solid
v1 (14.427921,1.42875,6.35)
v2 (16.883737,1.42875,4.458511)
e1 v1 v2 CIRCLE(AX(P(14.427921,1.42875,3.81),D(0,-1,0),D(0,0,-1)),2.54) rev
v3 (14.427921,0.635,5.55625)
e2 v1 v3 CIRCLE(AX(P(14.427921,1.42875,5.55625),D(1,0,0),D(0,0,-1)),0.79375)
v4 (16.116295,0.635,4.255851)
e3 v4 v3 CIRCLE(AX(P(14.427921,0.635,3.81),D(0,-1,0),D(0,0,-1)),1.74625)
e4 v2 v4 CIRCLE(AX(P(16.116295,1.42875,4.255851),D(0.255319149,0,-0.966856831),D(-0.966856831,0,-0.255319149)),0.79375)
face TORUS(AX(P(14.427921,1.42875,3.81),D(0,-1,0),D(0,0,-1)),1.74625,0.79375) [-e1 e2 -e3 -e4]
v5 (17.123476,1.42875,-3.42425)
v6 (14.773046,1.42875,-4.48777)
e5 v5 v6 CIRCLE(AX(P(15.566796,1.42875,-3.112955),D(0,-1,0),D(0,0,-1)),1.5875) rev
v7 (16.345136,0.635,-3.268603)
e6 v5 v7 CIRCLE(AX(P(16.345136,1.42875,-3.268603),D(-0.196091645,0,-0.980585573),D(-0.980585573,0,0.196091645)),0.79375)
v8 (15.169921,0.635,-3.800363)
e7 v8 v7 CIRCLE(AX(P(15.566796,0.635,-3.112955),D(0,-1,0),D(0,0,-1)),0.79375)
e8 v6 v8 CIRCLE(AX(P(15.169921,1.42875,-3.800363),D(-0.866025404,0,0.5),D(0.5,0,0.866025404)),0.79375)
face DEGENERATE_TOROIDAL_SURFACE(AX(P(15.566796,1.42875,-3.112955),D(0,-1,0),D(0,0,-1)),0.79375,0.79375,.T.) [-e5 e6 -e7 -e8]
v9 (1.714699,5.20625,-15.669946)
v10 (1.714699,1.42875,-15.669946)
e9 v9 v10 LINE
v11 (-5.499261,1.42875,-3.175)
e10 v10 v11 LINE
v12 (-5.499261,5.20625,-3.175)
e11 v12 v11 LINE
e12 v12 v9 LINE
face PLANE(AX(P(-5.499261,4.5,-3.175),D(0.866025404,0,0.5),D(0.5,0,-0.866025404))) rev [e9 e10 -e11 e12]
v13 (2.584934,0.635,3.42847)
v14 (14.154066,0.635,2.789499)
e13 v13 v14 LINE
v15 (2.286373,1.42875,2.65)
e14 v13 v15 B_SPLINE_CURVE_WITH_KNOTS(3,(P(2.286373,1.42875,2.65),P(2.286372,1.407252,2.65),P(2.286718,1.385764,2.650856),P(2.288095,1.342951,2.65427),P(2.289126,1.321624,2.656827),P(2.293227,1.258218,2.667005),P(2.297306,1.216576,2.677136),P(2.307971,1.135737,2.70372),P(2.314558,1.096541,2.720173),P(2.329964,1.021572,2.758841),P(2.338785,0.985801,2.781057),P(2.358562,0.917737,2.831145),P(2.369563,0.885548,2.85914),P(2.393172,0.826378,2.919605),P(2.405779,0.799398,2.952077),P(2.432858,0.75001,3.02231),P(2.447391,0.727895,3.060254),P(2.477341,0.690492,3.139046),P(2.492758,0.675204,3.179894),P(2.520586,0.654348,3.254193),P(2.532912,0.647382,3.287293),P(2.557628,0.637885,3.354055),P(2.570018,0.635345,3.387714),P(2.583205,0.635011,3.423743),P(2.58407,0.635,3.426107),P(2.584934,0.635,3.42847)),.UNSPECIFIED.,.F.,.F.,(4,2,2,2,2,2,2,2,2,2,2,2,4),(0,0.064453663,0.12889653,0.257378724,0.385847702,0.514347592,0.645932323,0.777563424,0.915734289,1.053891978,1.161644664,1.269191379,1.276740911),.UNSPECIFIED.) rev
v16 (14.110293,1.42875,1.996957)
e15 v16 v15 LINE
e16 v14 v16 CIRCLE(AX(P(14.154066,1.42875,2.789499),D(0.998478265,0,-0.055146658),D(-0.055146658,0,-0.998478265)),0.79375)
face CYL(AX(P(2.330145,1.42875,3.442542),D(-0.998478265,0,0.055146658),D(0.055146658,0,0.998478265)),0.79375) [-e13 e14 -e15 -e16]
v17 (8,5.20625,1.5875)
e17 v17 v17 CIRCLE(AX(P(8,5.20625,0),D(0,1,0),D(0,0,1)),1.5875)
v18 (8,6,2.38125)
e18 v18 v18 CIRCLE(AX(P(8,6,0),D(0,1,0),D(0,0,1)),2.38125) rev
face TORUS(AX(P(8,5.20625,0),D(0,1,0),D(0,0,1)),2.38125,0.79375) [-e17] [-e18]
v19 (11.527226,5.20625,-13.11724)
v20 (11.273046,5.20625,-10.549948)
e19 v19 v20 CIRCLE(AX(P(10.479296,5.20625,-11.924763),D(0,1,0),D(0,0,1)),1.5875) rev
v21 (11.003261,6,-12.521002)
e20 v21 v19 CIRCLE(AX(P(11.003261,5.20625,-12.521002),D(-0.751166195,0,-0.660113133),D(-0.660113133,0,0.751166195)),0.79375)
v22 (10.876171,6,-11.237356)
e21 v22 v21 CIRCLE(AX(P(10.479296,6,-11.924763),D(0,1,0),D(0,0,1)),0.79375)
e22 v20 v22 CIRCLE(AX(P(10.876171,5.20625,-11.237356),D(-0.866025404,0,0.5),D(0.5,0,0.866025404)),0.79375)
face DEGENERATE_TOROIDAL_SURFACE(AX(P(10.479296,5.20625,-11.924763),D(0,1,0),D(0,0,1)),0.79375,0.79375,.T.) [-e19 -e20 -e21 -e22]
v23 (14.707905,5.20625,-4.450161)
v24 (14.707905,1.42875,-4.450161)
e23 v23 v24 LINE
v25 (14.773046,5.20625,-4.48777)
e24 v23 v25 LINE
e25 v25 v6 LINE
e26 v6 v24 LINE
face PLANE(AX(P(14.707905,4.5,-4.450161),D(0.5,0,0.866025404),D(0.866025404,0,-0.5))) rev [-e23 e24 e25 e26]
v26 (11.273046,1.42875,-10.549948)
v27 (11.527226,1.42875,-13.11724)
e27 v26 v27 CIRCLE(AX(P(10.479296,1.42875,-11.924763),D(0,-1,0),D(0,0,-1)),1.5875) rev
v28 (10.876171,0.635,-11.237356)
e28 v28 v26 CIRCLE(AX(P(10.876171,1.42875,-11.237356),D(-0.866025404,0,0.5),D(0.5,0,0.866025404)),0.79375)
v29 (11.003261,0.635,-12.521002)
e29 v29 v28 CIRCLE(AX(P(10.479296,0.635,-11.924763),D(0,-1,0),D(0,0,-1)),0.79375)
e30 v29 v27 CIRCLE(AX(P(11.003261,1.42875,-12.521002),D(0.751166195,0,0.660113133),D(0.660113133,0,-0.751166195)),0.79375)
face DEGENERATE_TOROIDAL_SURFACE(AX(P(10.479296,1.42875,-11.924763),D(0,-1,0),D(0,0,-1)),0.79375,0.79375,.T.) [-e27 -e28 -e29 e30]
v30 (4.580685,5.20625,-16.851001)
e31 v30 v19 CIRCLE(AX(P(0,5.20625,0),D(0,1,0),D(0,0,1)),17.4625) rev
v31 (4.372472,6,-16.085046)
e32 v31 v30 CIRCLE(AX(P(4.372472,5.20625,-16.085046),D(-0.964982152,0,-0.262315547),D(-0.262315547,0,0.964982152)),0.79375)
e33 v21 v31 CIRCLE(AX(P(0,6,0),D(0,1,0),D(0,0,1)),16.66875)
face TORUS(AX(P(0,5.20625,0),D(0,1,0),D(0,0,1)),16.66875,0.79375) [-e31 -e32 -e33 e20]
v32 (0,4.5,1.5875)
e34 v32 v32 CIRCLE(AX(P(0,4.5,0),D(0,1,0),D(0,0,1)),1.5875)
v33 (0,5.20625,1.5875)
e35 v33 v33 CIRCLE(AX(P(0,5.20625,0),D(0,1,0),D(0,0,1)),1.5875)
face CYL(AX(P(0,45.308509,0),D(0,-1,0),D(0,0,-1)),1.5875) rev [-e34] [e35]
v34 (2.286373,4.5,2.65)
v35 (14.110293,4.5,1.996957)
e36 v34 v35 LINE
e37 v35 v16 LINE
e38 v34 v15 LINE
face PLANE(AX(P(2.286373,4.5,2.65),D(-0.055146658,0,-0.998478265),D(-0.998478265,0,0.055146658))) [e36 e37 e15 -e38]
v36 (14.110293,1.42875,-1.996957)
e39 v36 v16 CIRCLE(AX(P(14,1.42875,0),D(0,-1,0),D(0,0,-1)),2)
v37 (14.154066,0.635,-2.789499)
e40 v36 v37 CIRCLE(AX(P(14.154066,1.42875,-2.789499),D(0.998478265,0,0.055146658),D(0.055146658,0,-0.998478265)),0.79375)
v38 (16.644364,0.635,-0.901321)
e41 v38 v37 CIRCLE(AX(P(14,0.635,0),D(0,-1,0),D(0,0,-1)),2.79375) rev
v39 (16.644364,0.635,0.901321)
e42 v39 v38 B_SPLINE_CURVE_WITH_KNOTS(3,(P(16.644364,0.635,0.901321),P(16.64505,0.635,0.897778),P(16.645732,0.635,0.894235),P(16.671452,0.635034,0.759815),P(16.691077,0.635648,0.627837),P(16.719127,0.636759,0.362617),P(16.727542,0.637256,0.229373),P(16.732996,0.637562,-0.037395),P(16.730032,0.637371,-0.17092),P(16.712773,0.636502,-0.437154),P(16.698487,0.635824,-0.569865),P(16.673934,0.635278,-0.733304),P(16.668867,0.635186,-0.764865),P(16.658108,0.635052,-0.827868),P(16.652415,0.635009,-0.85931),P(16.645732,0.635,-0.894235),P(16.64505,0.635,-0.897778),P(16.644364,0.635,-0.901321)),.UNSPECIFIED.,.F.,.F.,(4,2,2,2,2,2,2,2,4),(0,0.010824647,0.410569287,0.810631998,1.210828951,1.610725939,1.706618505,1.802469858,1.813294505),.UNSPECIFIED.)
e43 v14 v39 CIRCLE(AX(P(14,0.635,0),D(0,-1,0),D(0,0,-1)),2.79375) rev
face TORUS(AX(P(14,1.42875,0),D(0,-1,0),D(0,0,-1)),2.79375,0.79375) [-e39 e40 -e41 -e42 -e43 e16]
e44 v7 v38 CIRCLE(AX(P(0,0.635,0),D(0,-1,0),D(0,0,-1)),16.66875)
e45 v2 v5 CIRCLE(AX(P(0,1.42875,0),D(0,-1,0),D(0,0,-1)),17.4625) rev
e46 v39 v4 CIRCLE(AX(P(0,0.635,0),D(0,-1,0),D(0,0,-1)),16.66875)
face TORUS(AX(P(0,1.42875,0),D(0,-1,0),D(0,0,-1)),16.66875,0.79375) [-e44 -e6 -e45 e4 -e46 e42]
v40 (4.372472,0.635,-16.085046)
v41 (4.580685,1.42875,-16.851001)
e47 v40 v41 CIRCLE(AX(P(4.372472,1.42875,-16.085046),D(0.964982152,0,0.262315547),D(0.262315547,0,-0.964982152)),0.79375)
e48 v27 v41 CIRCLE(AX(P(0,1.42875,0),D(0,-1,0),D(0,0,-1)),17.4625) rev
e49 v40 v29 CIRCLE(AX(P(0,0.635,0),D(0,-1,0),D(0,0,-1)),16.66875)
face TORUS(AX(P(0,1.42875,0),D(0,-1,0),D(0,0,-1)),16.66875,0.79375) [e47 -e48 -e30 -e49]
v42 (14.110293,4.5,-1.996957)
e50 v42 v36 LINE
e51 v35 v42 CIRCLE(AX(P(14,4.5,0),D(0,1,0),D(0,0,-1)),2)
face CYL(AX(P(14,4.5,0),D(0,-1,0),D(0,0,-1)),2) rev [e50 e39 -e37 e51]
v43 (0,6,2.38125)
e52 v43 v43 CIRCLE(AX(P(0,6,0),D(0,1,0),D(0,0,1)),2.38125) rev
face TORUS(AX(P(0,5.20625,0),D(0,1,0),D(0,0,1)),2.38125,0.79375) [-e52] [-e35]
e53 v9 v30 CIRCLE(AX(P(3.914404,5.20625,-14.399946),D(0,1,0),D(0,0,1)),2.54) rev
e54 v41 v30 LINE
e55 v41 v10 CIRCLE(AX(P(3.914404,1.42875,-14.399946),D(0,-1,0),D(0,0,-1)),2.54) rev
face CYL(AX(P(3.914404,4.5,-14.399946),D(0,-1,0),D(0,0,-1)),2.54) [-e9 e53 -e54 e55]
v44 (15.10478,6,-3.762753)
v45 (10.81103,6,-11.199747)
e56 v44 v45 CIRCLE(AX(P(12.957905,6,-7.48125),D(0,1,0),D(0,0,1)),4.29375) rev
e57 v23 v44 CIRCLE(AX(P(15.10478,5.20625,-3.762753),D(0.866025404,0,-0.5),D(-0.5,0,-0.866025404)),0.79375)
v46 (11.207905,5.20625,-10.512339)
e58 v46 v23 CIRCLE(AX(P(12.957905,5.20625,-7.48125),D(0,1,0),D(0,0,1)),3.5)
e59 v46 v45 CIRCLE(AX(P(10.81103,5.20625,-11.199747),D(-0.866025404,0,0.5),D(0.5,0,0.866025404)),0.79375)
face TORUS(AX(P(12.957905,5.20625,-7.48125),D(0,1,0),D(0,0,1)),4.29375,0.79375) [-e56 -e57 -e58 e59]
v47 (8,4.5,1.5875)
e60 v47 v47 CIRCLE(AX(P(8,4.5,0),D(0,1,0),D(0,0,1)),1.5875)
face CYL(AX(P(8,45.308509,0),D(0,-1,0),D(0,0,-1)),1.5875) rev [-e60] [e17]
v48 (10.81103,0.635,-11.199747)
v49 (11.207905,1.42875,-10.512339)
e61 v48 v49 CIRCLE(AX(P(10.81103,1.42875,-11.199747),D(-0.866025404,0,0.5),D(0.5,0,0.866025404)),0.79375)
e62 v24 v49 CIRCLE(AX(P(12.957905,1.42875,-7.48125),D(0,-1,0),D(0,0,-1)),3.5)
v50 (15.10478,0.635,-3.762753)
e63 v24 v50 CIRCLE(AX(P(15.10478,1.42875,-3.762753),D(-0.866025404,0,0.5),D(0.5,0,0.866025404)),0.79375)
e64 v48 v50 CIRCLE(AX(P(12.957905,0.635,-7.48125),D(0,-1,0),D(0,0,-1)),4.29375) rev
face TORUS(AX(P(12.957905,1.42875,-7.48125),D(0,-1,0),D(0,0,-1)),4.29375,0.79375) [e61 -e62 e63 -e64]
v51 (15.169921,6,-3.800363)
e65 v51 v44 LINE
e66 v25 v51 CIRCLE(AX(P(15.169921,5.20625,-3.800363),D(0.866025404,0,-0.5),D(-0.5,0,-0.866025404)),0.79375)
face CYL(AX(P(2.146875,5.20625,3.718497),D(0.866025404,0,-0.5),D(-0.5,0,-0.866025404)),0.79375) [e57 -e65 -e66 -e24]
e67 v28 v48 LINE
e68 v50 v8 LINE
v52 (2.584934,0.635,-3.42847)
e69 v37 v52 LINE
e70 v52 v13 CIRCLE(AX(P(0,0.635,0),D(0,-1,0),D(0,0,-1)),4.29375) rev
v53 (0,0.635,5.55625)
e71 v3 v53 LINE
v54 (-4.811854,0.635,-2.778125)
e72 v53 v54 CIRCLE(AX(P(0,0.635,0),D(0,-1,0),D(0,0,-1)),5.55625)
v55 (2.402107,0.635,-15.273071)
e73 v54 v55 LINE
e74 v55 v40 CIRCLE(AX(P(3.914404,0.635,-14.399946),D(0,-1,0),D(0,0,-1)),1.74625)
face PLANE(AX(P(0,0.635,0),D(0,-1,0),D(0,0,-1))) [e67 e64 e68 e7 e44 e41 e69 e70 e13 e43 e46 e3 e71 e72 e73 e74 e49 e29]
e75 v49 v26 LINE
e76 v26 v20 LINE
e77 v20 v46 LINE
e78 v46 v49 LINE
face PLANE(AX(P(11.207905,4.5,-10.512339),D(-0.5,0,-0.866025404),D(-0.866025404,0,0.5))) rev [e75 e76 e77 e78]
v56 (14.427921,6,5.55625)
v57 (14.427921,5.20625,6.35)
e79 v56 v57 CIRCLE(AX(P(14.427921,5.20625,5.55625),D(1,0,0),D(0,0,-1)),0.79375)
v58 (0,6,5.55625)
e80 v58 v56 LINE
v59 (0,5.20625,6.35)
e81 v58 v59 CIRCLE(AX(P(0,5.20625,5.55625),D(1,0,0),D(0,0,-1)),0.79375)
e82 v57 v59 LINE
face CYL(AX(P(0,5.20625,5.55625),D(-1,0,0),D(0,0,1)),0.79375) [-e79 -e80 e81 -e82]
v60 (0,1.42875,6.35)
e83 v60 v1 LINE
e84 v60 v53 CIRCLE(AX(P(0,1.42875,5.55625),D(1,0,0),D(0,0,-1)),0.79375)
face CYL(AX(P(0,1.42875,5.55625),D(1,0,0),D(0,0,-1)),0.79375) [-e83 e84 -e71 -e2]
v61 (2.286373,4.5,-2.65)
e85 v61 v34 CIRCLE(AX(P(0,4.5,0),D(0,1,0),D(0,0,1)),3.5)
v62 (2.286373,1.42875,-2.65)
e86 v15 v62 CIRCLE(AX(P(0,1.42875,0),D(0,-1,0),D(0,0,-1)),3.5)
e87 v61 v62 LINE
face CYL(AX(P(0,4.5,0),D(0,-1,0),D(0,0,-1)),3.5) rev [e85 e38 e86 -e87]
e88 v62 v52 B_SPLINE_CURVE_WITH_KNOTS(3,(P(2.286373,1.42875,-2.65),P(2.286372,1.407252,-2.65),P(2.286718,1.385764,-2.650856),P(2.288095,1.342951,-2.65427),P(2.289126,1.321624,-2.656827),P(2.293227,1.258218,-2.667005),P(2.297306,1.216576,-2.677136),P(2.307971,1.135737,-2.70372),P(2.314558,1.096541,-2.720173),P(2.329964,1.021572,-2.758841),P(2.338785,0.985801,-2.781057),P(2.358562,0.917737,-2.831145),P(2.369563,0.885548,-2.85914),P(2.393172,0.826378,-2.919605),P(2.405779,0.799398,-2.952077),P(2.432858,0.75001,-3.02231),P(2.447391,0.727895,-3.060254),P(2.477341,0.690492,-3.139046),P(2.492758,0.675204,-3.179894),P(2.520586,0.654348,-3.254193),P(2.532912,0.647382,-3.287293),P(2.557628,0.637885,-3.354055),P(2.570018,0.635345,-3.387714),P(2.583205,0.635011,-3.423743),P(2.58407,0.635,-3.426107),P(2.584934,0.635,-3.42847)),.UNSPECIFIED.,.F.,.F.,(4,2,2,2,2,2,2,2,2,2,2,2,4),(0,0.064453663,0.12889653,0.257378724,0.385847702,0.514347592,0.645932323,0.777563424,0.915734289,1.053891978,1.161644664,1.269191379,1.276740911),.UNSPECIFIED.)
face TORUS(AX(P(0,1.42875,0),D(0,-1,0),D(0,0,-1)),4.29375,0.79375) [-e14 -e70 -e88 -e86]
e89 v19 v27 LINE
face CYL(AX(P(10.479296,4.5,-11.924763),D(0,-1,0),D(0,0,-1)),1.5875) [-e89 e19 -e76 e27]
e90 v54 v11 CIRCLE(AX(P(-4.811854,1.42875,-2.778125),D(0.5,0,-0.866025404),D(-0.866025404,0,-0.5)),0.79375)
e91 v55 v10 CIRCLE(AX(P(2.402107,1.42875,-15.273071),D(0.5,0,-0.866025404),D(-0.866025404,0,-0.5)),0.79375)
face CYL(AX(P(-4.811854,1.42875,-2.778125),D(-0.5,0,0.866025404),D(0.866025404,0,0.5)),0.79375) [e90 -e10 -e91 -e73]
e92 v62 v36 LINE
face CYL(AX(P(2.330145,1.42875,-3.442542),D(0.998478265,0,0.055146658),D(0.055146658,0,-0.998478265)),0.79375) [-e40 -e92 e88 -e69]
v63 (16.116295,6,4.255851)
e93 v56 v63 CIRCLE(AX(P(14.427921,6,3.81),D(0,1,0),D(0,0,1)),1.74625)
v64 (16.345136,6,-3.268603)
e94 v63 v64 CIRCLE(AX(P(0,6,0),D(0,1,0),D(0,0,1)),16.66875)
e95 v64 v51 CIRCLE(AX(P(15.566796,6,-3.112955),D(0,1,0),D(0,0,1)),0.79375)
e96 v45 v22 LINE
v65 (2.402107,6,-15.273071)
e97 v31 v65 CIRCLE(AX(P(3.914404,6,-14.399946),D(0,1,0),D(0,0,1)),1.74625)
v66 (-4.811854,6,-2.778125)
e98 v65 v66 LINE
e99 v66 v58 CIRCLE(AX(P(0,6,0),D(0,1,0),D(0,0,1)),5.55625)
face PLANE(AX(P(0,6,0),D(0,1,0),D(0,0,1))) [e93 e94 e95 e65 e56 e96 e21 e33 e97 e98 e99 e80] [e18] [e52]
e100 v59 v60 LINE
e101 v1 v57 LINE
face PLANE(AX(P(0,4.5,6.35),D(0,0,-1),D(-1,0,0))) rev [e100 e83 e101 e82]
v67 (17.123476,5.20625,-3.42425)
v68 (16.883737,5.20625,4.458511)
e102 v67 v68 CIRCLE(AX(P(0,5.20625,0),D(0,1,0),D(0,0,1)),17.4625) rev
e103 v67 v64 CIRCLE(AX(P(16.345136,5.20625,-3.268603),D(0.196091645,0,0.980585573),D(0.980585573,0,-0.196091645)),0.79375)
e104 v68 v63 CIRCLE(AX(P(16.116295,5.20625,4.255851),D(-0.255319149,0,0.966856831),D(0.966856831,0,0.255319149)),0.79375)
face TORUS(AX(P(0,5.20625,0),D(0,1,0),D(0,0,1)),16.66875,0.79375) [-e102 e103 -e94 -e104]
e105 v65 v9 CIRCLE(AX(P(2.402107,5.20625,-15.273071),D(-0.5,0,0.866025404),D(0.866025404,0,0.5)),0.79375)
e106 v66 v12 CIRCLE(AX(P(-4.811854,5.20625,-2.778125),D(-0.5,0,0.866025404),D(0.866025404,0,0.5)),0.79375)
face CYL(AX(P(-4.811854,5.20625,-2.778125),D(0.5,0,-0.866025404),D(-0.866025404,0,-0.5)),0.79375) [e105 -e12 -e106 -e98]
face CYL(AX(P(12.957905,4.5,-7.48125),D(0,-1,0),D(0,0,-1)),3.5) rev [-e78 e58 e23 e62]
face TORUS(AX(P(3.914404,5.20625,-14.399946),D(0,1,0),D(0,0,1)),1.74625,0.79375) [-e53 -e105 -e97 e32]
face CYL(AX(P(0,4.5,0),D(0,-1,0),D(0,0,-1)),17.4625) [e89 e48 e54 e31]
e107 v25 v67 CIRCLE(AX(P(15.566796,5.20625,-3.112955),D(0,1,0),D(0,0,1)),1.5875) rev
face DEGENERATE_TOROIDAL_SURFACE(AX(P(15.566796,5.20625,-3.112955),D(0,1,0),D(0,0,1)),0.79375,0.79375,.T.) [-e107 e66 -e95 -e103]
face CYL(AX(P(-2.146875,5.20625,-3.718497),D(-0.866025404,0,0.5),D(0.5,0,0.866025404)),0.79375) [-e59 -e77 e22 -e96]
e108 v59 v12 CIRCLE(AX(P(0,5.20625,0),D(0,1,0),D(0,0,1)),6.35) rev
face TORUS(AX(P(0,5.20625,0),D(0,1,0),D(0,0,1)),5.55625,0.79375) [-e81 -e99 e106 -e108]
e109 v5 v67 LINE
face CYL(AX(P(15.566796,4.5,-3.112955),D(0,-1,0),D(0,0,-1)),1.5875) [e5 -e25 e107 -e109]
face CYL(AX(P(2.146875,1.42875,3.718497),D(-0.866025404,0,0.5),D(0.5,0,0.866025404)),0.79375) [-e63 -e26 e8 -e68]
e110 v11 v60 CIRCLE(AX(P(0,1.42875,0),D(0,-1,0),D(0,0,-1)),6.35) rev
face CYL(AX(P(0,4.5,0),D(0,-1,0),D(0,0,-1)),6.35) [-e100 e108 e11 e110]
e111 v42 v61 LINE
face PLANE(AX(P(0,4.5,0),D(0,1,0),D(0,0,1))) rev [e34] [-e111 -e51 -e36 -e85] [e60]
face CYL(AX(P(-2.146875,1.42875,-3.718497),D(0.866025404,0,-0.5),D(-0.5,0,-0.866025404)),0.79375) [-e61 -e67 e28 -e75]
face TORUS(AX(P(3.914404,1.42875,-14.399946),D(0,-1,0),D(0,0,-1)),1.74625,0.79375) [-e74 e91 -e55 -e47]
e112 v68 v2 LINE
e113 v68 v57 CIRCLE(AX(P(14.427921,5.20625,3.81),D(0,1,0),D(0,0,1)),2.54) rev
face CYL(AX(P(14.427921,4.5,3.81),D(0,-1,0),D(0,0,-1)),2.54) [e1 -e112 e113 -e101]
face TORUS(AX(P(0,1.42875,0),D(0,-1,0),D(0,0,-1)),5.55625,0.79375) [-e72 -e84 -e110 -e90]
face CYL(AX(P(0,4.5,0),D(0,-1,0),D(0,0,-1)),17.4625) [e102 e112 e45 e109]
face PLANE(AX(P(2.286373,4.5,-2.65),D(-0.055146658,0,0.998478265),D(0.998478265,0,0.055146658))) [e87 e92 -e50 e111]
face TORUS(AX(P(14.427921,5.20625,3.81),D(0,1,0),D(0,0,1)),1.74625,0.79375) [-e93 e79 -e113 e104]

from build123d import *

# Parameters (mm, degrees)
BOSS_EXTRUDE1_DEPTH = 4.5
FILLET4_R           = 2.54
SKETCH2_R           = 1.5875
BOSS_EXTRUDE2_DEPTH = 1.5
CUT_EXTRUDE1_DEPTH  = 0.635
FILLET1_R           = 1.5875
FILLET2_R           = 0.79375
FILLET3_R           = 0.79375


with BuildPart() as part:
    # Sketch1 → Boss-Extrude1 (new body)
    with BuildSketch(Plane(origin=(0, 0, 0), x_dir=(1, 0, 0), z_dir=(0, 1, 0))):
        with BuildLine():
            Line((11.207905104, 10.512338913), (13.066095292, 11.585165518))
            ThreePointArc((13.066095292, 11.585165518), (8.347679713, 15.338029523), (2.634255856, 17.262664984))
            Line((2.634255856, 17.262664984), (-5.499261314, 3.175))
            ThreePointArc((-5.499261314, 3.175), (-5.499261314, -3.175), (0, -6.35))
            Line((0, -6.35), (16.267034341, -6.35))
            ThreePointArc((16.267034341, -6.35), (17.456963068, -0.439712068), (16.566095292, 5.522987692))
            Line((16.566095292, 5.522987692), (14.707905104, 4.450161087))
            ThreePointArc((14.707905104, 4.450161087), (9.926816191, 5.73125), (11.207905104, 10.512338913))
        make_face()
        with BuildLine():
            Line((2.286372673, 2.65), (14.110293316, 1.99695653))
            ThreePointArc((14.110293316, 1.99695653), (16, 0), (14.110293316, -1.99695653))
            Line((14.110293316, -1.99695653), (2.286372673, -2.65))
            ThreePointArc((2.286372673, -2.65), (-3.5, 0), (2.286372673, 2.65))
        make_face(mode=Mode.SUBTRACT)
    extrude(amount=BOSS_EXTRUDE1_DEPTH)

    # Fillet4
    fillet4_edges = [part.edges().sort_by_distance(p)[0] for p in [
        (2.634255856, 2.25, -17.262664984),
        (16.267034341, 2.25, 6.35),
    ]]
    fillet(fillet4_edges, radius=FILLET4_R)

    # Sketch2 → Boss-Extrude2 (add)
    with BuildSketch(Plane(origin=(0, 4.5, 0), x_dir=(1, 0, 0), z_dir=(0, 1, 0))):
        with BuildLine():
            Line((16.566095292, 5.522987692), (14.707905104, 4.450161087))
            ThreePointArc((14.707905104, 4.450161087), (9.926816191, 5.73125), (11.207905104, 10.512338913))
            Line((11.207905104, 10.512338913), (13.066095292, 11.585165518))
            ThreePointArc((13.066095292, 11.585165518), (9.207848343, 14.837602069), (4.580685232, 16.851000832))
            ThreePointArc((4.580685232, 16.851000832), (2.94663875, 16.748356461), (1.714699218, 15.669946166))
            Line((1.714699218, 15.669946166), (-5.499261314, 3.175))
            ThreePointArc((-5.499261314, 3.175), (-5.499261314, -3.175), (0, -6.35))
            Line((0, -6.35), (14.427921065, -6.35))
            ThreePointArc((14.427921065, -6.35), (15.977821542, -5.822314218), (16.883737416, -4.458510638))
            ThreePointArc((16.883737416, -4.458510638), (17.453664494, 0.555429545), (16.566095292, 5.522987692))
        make_face()
        with Locations(Location((0, 0, 0), (0, 0, 270))):
            Circle(SKETCH2_R, mode=Mode.SUBTRACT)
        with Locations(Location((8, 0, 0), (0, 0, 270))):
            Circle(SKETCH2_R, mode=Mode.SUBTRACT)
    extrude(amount=BOSS_EXTRUDE2_DEPTH)

    # Sketch3 → Cut-Extrude1 (cut)
    with BuildSketch(Plane.XZ):
        with BuildLine():
            Line((-5.499261314, -3.175), (1.714699218, -15.669946166))
            ThreePointArc((1.714699218, -15.669946166), (2.94663875, -16.748356461), (4.580685232, -16.851000832))
            ThreePointArc((4.580685232, -16.851000832), (9.207848343, -14.837602069), (13.066095292, -11.585165518))
            Line((13.066095292, -11.585165518), (11.207905104, -10.512338913))
            ThreePointArc((11.207905104, -10.512338913), (9.926816191, -5.73125), (14.707905104, -4.450161087))
            Line((14.707905104, -4.450161087), (16.566095292, -5.522987692))
            ThreePointArc((16.566095292, -5.522987692), (17.453664494, -0.555429545), (16.883737416, 4.458510638))
            ThreePointArc((16.883737416, 4.458510638), (15.977821542, 5.822314218), (14.427921065, 6.35))
            Line((14.427921065, 6.35), (0, 6.35))
            ThreePointArc((0, 6.35), (-5.499261314, 3.175), (-5.499261314, -3.175))
        make_face()
    extrude(amount=-CUT_EXTRUDE1_DEPTH, mode=Mode.SUBTRACT)

    # Fillet1
    fillet1_edges = [part.edges().sort_by_distance(p)[0] for p in [
        (13.066095292, 3.3175, -11.585165518),
        (16.566095292, 3.3175, -5.522987692),
    ]]
    fillet(fillet1_edges, radius=FILLET1_R)

    # Fillet2
    # the kernel refuses this fillet: 0.79375 mm, written as the material it takes off along each edge
    with BuildSketch(Plane(origin=(0.305017366, 0.635, 2.75943165), x_dir=(0.05514665822650493, 0, 0.9984782652048311), z_dir=(0.9984782652048312, 0, -0.055146658226504934)), Plane(origin=(14.110293316, 0.635, -1.99695653), x_dir=(0.055146658226504934, 0, -0.9984782652048311), z_dir=(-0.9984782652048312, 0, -0.055146658226504934))) as fillet2_piece_1:
        with BuildLine():
            CenterArc((FILLET2_R, -FILLET2_R), FILLET2_R, 90, 90)
            Line((0, -FILLET2_R), (0, 0))
            Line((0, 0), (FILLET2_R, 0))
        make_face()
    extrude(amount=13.826315937, mode=Mode.SUBTRACT)
    with BuildSketch(Plane(origin=(0, 0.635, 0), x_dir=(0.958233566749164, 0, 0.28598676814701657), z_dir=(0.28598676814701657, 0, -0.958233566749164))) as fillet2_piece_2:
        with BuildLine():
            CenterArc((3.5 + FILLET2_R, -FILLET2_R), FILLET2_R, 90, 90)
            Line((3.5, -FILLET2_R), (3.5, 0))
            Line((3.5, 0), (3.5 + FILLET2_R, 0))
        make_face()
    revolve(axis=Axis((0, 0.635, 0), (0, -1, 0)), revolution_arc=326.764317032, mode=Mode.SUBTRACT)
    with BuildSketch(Plane(origin=(14, 0.635, 0), x_dir=(0.055146658226505, 0, -0.9984782652048312), z_dir=(-0.9984782652048312, 0, -0.055146658226505))) as fillet2_piece_3:
        with BuildLine():
            CenterArc((2 + FILLET2_R, -FILLET2_R), FILLET2_R, 90, 90)
            Line((2, -FILLET2_R), (2, 0))
            Line((2, 0), (2 + FILLET2_R, 0))
        make_face()
    revolve(axis=Axis((14, 0.635, 0), (0, -1, 0)), revolution_arc=173.677451052, mode=Mode.SUBTRACT)
    with BuildSketch(Plane(origin=(11.273045979, 0.635, -10.549948015), x_dir=(-0.5, 0, -0.8660254037844386), z_dir=(-0.8660254037844387, 0, 0.5000000000000001)), Plane(origin=(14.707905104, 0.635, -4.450161087), x_dir=(0.5000000000000067, 0, 0.8660254037844347), z_dir=(0.8660254037844348, 0, -0.5000000000000067))) as fillet2_piece_4:
        with BuildLine():
            CenterArc((FILLET2_R, -FILLET2_R), FILLET2_R, 90, 90)
            Line((0, -FILLET2_R), (0, 0))
            Line((0, 0), (FILLET2_R, 0))
        make_face()
    extrude(amount=0.075218203, mode=Mode.SUBTRACT)
    with BuildSketch(Plane(origin=(0, 0.635, 0), x_dir=(0.9805855734593999, 0, -0.19609164470547952), z_dir=(-0.19609164470547952, 0, -0.9805855734593999))) as fillet2_piece_5:
        with BuildLine():
            CenterArc((17.4625 - FILLET2_R, -FILLET2_R), FILLET2_R, 0, 90)
            Line((17.4625 - FILLET2_R, 0), (17.4625, 0))
            Line((17.4625, 0), (17.4625, -FILLET2_R))
        make_face()
    revolve(axis=Axis((0, 0.635, 0), (0, -1, 0)), revolution_arc=26.100998532, mode=Mode.SUBTRACT)
    with BuildSketch(Plane(origin=(10.479295979, 0.635, -11.924763343), x_dir=(0.6601131325145184, 0, -0.7511661948476316), z_dir=(-0.7511661948476316, 0, -0.6601131325145184))) as fillet2_piece_6:
        with BuildLine():
            CenterArc((1.5875 - FILLET2_R, -FILLET2_R), FILLET2_R, 0, 90)
            Line((1.5875, -FILLET2_R), (1.5875, 0))
            Line((1.5875, 0), (1.5875 - FILLET2_R, 0))
        make_face()
    revolve(axis=Axis((10.479295979, 0.635, -11.924763343), (0, -1, 0)), revolution_arc=108.69149851, mode=Mode.SUBTRACT)
    with BuildSketch(Plane(origin=(15.566795979, 0.635, -3.11295486), x_dir=(0.9805855734593999, 0, -0.1960916447054792), z_dir=(0.1960916447054792, 0, 0.9805855734593999))) as fillet2_piece_7:
        with BuildLine():
            CenterArc((1.5875 - FILLET2_R, FILLET2_R), FILLET2_R, 270, 90)
            Line((1.5875, FILLET2_R), (1.5875, 0))
            Line((1.5875, 0), (1.5875 - FILLET2_R, 0))
        make_face()
    revolve(axis=Axis((15.566795979, 0.635, -3.11295486), (0, 1, 0)), revolution_arc=108.69149851, mode=Mode.SUBTRACT)
    with BuildSketch(Plane(origin=(0, 0.635, 0), x_dir=(0, 0, 1), z_dir=(1, 0, 0))) as fillet2_piece_8:
        with BuildLine():
            CenterArc((6.35 - FILLET2_R, -FILLET2_R), FILLET2_R, 0, 90)
            Line((6.35, -FILLET2_R), (6.35, 0))
            Line((6.35, 0), (6.35 - FILLET2_R, 0))
        make_face()
    revolve(axis=Axis((0, 0.635, 0), (0, -1, 0)), revolution_arc=120, mode=Mode.SUBTRACT)
    with BuildSketch(Plane(origin=(14.427921065, 0.635, 6.35), x_dir=(0, 0, -1), z_dir=(-1, 0, 0)), Plane(origin=(-5.499261314, 0.635, -3.175), x_dir=(0.8660254037844398, 0, 0.49999999999999817), z_dir=(0.49999999999999817, 0, -0.8660254037844397))) as fillet2_piece_9:
        with BuildLine():
            CenterArc((FILLET2_R, -FILLET2_R), FILLET2_R, 90, 90)
            Line((0, -FILLET2_R), (0, 0))
            Line((0, 0), (FILLET2_R, 0))
        make_face()
    extrude(amount=14.427921065, mode=Mode.SUBTRACT)
    with BuildSketch(Plane(origin=(14.427921065, 0.635, 3.81), x_dir=(0.9668568312767465, 0, 0.25531914893616775), z_dir=(0.25531914893616775, 0, -0.9668568312767465))) as fillet2_piece_10:
        with BuildLine():
            CenterArc((2.54 - FILLET2_R, -FILLET2_R), FILLET2_R, 0, 90)
            Line((2.54, -FILLET2_R), (2.54, 0))
            Line((2.54, 0), (2.54 - FILLET2_R, 0))
        make_face()
    revolve(axis=Axis((14.427921065, 0.635, 3.81), (0, -1, 0)), revolution_arc=75.207502959, mode=Mode.SUBTRACT)
    with BuildSketch(Plane(origin=(12.957905104, 0.635, -7.48125), x_dir=(-0.5000000000000012, 0, -0.8660254037844379), z_dir=(0.8660254037844379, 0, -0.5000000000000012))) as fillet2_piece_11:
        with BuildLine():
            CenterArc((3.5 + FILLET2_R, FILLET2_R), FILLET2_R, 180, 90)
            Line((3.5, FILLET2_R), (3.5, 0))
            Line((3.5, 0), (3.5 + FILLET2_R, 0))
        make_face()
    revolve(axis=Axis((12.957905104, 0.635, -7.48125), (0, 1, 0)), revolution_arc=180, mode=Mode.SUBTRACT)
    with BuildSketch(Plane(origin=(0, 0.635, 0), x_dir=(0.26231554658702627, 0, -0.9649821521762719), z_dir=(-0.9649821521762719, 0, -0.26231554658702627))) as fillet2_piece_12:
        with BuildLine():
            CenterArc((17.4625 - FILLET2_R, -FILLET2_R), FILLET2_R, 0, 90)
            Line((17.4625, -FILLET2_R), (17.4625, 0))
            Line((17.4625, 0), (17.4625 - FILLET2_R, 0))
        make_face()
    revolve(axis=Axis((0, 0.635, 0), (0, -1, 0)), revolution_arc=26.100998532, mode=Mode.SUBTRACT)
    with BuildSketch(Plane(origin=(3.914403744, 0.635, -14.399946166), x_dir=(-0.8660254037844385, 0, -0.5000000000000003), z_dir=(-0.5000000000000003, 0, 0.8660254037844385))) as fillet2_piece_13:
        with BuildLine():
            CenterArc((2.54 - FILLET2_R, -FILLET2_R), FILLET2_R, 0, 90)
            Line((2.54, -FILLET2_R), (2.54, 0))
            Line((2.54, 0), (2.54 - FILLET2_R, 0))
        make_face()
    revolve(axis=Axis((3.914403744, 0.635, -14.399946166), (0, -1, 0)), revolution_arc=75.207502959, mode=Mode.SUBTRACT)

    # Fillet3
    fillet3_edges = [part.edges().sort_by_distance(p)[0] for p in [
        (14.740475541, 6, -4.468965637),
        (8.267493015, 6, -15.381399985),
        (12.059072088, 6, -11.768354602),
        (16.22123009, 6, -4.559285473),
        (0, 6, -1.5875),
        (8, 6, -1.5875),
        (-1.892281048, 6, -9.422473083),
        (-5.499261314, 6, 3.175),
        (7.213960532, 6, 6.35),
        (15.977821542, 6, 5.822314218),
        (17.45442964, 6, 0.530841016),
        (9.926816191, 6, -5.73125),
        (11.240475541, 6, -10.531143464),
        (2.94663875, 6, -16.748356461),
    ]]
    fillet(fillet3_edges, radius=FILLET3_R)


solid = part.part
